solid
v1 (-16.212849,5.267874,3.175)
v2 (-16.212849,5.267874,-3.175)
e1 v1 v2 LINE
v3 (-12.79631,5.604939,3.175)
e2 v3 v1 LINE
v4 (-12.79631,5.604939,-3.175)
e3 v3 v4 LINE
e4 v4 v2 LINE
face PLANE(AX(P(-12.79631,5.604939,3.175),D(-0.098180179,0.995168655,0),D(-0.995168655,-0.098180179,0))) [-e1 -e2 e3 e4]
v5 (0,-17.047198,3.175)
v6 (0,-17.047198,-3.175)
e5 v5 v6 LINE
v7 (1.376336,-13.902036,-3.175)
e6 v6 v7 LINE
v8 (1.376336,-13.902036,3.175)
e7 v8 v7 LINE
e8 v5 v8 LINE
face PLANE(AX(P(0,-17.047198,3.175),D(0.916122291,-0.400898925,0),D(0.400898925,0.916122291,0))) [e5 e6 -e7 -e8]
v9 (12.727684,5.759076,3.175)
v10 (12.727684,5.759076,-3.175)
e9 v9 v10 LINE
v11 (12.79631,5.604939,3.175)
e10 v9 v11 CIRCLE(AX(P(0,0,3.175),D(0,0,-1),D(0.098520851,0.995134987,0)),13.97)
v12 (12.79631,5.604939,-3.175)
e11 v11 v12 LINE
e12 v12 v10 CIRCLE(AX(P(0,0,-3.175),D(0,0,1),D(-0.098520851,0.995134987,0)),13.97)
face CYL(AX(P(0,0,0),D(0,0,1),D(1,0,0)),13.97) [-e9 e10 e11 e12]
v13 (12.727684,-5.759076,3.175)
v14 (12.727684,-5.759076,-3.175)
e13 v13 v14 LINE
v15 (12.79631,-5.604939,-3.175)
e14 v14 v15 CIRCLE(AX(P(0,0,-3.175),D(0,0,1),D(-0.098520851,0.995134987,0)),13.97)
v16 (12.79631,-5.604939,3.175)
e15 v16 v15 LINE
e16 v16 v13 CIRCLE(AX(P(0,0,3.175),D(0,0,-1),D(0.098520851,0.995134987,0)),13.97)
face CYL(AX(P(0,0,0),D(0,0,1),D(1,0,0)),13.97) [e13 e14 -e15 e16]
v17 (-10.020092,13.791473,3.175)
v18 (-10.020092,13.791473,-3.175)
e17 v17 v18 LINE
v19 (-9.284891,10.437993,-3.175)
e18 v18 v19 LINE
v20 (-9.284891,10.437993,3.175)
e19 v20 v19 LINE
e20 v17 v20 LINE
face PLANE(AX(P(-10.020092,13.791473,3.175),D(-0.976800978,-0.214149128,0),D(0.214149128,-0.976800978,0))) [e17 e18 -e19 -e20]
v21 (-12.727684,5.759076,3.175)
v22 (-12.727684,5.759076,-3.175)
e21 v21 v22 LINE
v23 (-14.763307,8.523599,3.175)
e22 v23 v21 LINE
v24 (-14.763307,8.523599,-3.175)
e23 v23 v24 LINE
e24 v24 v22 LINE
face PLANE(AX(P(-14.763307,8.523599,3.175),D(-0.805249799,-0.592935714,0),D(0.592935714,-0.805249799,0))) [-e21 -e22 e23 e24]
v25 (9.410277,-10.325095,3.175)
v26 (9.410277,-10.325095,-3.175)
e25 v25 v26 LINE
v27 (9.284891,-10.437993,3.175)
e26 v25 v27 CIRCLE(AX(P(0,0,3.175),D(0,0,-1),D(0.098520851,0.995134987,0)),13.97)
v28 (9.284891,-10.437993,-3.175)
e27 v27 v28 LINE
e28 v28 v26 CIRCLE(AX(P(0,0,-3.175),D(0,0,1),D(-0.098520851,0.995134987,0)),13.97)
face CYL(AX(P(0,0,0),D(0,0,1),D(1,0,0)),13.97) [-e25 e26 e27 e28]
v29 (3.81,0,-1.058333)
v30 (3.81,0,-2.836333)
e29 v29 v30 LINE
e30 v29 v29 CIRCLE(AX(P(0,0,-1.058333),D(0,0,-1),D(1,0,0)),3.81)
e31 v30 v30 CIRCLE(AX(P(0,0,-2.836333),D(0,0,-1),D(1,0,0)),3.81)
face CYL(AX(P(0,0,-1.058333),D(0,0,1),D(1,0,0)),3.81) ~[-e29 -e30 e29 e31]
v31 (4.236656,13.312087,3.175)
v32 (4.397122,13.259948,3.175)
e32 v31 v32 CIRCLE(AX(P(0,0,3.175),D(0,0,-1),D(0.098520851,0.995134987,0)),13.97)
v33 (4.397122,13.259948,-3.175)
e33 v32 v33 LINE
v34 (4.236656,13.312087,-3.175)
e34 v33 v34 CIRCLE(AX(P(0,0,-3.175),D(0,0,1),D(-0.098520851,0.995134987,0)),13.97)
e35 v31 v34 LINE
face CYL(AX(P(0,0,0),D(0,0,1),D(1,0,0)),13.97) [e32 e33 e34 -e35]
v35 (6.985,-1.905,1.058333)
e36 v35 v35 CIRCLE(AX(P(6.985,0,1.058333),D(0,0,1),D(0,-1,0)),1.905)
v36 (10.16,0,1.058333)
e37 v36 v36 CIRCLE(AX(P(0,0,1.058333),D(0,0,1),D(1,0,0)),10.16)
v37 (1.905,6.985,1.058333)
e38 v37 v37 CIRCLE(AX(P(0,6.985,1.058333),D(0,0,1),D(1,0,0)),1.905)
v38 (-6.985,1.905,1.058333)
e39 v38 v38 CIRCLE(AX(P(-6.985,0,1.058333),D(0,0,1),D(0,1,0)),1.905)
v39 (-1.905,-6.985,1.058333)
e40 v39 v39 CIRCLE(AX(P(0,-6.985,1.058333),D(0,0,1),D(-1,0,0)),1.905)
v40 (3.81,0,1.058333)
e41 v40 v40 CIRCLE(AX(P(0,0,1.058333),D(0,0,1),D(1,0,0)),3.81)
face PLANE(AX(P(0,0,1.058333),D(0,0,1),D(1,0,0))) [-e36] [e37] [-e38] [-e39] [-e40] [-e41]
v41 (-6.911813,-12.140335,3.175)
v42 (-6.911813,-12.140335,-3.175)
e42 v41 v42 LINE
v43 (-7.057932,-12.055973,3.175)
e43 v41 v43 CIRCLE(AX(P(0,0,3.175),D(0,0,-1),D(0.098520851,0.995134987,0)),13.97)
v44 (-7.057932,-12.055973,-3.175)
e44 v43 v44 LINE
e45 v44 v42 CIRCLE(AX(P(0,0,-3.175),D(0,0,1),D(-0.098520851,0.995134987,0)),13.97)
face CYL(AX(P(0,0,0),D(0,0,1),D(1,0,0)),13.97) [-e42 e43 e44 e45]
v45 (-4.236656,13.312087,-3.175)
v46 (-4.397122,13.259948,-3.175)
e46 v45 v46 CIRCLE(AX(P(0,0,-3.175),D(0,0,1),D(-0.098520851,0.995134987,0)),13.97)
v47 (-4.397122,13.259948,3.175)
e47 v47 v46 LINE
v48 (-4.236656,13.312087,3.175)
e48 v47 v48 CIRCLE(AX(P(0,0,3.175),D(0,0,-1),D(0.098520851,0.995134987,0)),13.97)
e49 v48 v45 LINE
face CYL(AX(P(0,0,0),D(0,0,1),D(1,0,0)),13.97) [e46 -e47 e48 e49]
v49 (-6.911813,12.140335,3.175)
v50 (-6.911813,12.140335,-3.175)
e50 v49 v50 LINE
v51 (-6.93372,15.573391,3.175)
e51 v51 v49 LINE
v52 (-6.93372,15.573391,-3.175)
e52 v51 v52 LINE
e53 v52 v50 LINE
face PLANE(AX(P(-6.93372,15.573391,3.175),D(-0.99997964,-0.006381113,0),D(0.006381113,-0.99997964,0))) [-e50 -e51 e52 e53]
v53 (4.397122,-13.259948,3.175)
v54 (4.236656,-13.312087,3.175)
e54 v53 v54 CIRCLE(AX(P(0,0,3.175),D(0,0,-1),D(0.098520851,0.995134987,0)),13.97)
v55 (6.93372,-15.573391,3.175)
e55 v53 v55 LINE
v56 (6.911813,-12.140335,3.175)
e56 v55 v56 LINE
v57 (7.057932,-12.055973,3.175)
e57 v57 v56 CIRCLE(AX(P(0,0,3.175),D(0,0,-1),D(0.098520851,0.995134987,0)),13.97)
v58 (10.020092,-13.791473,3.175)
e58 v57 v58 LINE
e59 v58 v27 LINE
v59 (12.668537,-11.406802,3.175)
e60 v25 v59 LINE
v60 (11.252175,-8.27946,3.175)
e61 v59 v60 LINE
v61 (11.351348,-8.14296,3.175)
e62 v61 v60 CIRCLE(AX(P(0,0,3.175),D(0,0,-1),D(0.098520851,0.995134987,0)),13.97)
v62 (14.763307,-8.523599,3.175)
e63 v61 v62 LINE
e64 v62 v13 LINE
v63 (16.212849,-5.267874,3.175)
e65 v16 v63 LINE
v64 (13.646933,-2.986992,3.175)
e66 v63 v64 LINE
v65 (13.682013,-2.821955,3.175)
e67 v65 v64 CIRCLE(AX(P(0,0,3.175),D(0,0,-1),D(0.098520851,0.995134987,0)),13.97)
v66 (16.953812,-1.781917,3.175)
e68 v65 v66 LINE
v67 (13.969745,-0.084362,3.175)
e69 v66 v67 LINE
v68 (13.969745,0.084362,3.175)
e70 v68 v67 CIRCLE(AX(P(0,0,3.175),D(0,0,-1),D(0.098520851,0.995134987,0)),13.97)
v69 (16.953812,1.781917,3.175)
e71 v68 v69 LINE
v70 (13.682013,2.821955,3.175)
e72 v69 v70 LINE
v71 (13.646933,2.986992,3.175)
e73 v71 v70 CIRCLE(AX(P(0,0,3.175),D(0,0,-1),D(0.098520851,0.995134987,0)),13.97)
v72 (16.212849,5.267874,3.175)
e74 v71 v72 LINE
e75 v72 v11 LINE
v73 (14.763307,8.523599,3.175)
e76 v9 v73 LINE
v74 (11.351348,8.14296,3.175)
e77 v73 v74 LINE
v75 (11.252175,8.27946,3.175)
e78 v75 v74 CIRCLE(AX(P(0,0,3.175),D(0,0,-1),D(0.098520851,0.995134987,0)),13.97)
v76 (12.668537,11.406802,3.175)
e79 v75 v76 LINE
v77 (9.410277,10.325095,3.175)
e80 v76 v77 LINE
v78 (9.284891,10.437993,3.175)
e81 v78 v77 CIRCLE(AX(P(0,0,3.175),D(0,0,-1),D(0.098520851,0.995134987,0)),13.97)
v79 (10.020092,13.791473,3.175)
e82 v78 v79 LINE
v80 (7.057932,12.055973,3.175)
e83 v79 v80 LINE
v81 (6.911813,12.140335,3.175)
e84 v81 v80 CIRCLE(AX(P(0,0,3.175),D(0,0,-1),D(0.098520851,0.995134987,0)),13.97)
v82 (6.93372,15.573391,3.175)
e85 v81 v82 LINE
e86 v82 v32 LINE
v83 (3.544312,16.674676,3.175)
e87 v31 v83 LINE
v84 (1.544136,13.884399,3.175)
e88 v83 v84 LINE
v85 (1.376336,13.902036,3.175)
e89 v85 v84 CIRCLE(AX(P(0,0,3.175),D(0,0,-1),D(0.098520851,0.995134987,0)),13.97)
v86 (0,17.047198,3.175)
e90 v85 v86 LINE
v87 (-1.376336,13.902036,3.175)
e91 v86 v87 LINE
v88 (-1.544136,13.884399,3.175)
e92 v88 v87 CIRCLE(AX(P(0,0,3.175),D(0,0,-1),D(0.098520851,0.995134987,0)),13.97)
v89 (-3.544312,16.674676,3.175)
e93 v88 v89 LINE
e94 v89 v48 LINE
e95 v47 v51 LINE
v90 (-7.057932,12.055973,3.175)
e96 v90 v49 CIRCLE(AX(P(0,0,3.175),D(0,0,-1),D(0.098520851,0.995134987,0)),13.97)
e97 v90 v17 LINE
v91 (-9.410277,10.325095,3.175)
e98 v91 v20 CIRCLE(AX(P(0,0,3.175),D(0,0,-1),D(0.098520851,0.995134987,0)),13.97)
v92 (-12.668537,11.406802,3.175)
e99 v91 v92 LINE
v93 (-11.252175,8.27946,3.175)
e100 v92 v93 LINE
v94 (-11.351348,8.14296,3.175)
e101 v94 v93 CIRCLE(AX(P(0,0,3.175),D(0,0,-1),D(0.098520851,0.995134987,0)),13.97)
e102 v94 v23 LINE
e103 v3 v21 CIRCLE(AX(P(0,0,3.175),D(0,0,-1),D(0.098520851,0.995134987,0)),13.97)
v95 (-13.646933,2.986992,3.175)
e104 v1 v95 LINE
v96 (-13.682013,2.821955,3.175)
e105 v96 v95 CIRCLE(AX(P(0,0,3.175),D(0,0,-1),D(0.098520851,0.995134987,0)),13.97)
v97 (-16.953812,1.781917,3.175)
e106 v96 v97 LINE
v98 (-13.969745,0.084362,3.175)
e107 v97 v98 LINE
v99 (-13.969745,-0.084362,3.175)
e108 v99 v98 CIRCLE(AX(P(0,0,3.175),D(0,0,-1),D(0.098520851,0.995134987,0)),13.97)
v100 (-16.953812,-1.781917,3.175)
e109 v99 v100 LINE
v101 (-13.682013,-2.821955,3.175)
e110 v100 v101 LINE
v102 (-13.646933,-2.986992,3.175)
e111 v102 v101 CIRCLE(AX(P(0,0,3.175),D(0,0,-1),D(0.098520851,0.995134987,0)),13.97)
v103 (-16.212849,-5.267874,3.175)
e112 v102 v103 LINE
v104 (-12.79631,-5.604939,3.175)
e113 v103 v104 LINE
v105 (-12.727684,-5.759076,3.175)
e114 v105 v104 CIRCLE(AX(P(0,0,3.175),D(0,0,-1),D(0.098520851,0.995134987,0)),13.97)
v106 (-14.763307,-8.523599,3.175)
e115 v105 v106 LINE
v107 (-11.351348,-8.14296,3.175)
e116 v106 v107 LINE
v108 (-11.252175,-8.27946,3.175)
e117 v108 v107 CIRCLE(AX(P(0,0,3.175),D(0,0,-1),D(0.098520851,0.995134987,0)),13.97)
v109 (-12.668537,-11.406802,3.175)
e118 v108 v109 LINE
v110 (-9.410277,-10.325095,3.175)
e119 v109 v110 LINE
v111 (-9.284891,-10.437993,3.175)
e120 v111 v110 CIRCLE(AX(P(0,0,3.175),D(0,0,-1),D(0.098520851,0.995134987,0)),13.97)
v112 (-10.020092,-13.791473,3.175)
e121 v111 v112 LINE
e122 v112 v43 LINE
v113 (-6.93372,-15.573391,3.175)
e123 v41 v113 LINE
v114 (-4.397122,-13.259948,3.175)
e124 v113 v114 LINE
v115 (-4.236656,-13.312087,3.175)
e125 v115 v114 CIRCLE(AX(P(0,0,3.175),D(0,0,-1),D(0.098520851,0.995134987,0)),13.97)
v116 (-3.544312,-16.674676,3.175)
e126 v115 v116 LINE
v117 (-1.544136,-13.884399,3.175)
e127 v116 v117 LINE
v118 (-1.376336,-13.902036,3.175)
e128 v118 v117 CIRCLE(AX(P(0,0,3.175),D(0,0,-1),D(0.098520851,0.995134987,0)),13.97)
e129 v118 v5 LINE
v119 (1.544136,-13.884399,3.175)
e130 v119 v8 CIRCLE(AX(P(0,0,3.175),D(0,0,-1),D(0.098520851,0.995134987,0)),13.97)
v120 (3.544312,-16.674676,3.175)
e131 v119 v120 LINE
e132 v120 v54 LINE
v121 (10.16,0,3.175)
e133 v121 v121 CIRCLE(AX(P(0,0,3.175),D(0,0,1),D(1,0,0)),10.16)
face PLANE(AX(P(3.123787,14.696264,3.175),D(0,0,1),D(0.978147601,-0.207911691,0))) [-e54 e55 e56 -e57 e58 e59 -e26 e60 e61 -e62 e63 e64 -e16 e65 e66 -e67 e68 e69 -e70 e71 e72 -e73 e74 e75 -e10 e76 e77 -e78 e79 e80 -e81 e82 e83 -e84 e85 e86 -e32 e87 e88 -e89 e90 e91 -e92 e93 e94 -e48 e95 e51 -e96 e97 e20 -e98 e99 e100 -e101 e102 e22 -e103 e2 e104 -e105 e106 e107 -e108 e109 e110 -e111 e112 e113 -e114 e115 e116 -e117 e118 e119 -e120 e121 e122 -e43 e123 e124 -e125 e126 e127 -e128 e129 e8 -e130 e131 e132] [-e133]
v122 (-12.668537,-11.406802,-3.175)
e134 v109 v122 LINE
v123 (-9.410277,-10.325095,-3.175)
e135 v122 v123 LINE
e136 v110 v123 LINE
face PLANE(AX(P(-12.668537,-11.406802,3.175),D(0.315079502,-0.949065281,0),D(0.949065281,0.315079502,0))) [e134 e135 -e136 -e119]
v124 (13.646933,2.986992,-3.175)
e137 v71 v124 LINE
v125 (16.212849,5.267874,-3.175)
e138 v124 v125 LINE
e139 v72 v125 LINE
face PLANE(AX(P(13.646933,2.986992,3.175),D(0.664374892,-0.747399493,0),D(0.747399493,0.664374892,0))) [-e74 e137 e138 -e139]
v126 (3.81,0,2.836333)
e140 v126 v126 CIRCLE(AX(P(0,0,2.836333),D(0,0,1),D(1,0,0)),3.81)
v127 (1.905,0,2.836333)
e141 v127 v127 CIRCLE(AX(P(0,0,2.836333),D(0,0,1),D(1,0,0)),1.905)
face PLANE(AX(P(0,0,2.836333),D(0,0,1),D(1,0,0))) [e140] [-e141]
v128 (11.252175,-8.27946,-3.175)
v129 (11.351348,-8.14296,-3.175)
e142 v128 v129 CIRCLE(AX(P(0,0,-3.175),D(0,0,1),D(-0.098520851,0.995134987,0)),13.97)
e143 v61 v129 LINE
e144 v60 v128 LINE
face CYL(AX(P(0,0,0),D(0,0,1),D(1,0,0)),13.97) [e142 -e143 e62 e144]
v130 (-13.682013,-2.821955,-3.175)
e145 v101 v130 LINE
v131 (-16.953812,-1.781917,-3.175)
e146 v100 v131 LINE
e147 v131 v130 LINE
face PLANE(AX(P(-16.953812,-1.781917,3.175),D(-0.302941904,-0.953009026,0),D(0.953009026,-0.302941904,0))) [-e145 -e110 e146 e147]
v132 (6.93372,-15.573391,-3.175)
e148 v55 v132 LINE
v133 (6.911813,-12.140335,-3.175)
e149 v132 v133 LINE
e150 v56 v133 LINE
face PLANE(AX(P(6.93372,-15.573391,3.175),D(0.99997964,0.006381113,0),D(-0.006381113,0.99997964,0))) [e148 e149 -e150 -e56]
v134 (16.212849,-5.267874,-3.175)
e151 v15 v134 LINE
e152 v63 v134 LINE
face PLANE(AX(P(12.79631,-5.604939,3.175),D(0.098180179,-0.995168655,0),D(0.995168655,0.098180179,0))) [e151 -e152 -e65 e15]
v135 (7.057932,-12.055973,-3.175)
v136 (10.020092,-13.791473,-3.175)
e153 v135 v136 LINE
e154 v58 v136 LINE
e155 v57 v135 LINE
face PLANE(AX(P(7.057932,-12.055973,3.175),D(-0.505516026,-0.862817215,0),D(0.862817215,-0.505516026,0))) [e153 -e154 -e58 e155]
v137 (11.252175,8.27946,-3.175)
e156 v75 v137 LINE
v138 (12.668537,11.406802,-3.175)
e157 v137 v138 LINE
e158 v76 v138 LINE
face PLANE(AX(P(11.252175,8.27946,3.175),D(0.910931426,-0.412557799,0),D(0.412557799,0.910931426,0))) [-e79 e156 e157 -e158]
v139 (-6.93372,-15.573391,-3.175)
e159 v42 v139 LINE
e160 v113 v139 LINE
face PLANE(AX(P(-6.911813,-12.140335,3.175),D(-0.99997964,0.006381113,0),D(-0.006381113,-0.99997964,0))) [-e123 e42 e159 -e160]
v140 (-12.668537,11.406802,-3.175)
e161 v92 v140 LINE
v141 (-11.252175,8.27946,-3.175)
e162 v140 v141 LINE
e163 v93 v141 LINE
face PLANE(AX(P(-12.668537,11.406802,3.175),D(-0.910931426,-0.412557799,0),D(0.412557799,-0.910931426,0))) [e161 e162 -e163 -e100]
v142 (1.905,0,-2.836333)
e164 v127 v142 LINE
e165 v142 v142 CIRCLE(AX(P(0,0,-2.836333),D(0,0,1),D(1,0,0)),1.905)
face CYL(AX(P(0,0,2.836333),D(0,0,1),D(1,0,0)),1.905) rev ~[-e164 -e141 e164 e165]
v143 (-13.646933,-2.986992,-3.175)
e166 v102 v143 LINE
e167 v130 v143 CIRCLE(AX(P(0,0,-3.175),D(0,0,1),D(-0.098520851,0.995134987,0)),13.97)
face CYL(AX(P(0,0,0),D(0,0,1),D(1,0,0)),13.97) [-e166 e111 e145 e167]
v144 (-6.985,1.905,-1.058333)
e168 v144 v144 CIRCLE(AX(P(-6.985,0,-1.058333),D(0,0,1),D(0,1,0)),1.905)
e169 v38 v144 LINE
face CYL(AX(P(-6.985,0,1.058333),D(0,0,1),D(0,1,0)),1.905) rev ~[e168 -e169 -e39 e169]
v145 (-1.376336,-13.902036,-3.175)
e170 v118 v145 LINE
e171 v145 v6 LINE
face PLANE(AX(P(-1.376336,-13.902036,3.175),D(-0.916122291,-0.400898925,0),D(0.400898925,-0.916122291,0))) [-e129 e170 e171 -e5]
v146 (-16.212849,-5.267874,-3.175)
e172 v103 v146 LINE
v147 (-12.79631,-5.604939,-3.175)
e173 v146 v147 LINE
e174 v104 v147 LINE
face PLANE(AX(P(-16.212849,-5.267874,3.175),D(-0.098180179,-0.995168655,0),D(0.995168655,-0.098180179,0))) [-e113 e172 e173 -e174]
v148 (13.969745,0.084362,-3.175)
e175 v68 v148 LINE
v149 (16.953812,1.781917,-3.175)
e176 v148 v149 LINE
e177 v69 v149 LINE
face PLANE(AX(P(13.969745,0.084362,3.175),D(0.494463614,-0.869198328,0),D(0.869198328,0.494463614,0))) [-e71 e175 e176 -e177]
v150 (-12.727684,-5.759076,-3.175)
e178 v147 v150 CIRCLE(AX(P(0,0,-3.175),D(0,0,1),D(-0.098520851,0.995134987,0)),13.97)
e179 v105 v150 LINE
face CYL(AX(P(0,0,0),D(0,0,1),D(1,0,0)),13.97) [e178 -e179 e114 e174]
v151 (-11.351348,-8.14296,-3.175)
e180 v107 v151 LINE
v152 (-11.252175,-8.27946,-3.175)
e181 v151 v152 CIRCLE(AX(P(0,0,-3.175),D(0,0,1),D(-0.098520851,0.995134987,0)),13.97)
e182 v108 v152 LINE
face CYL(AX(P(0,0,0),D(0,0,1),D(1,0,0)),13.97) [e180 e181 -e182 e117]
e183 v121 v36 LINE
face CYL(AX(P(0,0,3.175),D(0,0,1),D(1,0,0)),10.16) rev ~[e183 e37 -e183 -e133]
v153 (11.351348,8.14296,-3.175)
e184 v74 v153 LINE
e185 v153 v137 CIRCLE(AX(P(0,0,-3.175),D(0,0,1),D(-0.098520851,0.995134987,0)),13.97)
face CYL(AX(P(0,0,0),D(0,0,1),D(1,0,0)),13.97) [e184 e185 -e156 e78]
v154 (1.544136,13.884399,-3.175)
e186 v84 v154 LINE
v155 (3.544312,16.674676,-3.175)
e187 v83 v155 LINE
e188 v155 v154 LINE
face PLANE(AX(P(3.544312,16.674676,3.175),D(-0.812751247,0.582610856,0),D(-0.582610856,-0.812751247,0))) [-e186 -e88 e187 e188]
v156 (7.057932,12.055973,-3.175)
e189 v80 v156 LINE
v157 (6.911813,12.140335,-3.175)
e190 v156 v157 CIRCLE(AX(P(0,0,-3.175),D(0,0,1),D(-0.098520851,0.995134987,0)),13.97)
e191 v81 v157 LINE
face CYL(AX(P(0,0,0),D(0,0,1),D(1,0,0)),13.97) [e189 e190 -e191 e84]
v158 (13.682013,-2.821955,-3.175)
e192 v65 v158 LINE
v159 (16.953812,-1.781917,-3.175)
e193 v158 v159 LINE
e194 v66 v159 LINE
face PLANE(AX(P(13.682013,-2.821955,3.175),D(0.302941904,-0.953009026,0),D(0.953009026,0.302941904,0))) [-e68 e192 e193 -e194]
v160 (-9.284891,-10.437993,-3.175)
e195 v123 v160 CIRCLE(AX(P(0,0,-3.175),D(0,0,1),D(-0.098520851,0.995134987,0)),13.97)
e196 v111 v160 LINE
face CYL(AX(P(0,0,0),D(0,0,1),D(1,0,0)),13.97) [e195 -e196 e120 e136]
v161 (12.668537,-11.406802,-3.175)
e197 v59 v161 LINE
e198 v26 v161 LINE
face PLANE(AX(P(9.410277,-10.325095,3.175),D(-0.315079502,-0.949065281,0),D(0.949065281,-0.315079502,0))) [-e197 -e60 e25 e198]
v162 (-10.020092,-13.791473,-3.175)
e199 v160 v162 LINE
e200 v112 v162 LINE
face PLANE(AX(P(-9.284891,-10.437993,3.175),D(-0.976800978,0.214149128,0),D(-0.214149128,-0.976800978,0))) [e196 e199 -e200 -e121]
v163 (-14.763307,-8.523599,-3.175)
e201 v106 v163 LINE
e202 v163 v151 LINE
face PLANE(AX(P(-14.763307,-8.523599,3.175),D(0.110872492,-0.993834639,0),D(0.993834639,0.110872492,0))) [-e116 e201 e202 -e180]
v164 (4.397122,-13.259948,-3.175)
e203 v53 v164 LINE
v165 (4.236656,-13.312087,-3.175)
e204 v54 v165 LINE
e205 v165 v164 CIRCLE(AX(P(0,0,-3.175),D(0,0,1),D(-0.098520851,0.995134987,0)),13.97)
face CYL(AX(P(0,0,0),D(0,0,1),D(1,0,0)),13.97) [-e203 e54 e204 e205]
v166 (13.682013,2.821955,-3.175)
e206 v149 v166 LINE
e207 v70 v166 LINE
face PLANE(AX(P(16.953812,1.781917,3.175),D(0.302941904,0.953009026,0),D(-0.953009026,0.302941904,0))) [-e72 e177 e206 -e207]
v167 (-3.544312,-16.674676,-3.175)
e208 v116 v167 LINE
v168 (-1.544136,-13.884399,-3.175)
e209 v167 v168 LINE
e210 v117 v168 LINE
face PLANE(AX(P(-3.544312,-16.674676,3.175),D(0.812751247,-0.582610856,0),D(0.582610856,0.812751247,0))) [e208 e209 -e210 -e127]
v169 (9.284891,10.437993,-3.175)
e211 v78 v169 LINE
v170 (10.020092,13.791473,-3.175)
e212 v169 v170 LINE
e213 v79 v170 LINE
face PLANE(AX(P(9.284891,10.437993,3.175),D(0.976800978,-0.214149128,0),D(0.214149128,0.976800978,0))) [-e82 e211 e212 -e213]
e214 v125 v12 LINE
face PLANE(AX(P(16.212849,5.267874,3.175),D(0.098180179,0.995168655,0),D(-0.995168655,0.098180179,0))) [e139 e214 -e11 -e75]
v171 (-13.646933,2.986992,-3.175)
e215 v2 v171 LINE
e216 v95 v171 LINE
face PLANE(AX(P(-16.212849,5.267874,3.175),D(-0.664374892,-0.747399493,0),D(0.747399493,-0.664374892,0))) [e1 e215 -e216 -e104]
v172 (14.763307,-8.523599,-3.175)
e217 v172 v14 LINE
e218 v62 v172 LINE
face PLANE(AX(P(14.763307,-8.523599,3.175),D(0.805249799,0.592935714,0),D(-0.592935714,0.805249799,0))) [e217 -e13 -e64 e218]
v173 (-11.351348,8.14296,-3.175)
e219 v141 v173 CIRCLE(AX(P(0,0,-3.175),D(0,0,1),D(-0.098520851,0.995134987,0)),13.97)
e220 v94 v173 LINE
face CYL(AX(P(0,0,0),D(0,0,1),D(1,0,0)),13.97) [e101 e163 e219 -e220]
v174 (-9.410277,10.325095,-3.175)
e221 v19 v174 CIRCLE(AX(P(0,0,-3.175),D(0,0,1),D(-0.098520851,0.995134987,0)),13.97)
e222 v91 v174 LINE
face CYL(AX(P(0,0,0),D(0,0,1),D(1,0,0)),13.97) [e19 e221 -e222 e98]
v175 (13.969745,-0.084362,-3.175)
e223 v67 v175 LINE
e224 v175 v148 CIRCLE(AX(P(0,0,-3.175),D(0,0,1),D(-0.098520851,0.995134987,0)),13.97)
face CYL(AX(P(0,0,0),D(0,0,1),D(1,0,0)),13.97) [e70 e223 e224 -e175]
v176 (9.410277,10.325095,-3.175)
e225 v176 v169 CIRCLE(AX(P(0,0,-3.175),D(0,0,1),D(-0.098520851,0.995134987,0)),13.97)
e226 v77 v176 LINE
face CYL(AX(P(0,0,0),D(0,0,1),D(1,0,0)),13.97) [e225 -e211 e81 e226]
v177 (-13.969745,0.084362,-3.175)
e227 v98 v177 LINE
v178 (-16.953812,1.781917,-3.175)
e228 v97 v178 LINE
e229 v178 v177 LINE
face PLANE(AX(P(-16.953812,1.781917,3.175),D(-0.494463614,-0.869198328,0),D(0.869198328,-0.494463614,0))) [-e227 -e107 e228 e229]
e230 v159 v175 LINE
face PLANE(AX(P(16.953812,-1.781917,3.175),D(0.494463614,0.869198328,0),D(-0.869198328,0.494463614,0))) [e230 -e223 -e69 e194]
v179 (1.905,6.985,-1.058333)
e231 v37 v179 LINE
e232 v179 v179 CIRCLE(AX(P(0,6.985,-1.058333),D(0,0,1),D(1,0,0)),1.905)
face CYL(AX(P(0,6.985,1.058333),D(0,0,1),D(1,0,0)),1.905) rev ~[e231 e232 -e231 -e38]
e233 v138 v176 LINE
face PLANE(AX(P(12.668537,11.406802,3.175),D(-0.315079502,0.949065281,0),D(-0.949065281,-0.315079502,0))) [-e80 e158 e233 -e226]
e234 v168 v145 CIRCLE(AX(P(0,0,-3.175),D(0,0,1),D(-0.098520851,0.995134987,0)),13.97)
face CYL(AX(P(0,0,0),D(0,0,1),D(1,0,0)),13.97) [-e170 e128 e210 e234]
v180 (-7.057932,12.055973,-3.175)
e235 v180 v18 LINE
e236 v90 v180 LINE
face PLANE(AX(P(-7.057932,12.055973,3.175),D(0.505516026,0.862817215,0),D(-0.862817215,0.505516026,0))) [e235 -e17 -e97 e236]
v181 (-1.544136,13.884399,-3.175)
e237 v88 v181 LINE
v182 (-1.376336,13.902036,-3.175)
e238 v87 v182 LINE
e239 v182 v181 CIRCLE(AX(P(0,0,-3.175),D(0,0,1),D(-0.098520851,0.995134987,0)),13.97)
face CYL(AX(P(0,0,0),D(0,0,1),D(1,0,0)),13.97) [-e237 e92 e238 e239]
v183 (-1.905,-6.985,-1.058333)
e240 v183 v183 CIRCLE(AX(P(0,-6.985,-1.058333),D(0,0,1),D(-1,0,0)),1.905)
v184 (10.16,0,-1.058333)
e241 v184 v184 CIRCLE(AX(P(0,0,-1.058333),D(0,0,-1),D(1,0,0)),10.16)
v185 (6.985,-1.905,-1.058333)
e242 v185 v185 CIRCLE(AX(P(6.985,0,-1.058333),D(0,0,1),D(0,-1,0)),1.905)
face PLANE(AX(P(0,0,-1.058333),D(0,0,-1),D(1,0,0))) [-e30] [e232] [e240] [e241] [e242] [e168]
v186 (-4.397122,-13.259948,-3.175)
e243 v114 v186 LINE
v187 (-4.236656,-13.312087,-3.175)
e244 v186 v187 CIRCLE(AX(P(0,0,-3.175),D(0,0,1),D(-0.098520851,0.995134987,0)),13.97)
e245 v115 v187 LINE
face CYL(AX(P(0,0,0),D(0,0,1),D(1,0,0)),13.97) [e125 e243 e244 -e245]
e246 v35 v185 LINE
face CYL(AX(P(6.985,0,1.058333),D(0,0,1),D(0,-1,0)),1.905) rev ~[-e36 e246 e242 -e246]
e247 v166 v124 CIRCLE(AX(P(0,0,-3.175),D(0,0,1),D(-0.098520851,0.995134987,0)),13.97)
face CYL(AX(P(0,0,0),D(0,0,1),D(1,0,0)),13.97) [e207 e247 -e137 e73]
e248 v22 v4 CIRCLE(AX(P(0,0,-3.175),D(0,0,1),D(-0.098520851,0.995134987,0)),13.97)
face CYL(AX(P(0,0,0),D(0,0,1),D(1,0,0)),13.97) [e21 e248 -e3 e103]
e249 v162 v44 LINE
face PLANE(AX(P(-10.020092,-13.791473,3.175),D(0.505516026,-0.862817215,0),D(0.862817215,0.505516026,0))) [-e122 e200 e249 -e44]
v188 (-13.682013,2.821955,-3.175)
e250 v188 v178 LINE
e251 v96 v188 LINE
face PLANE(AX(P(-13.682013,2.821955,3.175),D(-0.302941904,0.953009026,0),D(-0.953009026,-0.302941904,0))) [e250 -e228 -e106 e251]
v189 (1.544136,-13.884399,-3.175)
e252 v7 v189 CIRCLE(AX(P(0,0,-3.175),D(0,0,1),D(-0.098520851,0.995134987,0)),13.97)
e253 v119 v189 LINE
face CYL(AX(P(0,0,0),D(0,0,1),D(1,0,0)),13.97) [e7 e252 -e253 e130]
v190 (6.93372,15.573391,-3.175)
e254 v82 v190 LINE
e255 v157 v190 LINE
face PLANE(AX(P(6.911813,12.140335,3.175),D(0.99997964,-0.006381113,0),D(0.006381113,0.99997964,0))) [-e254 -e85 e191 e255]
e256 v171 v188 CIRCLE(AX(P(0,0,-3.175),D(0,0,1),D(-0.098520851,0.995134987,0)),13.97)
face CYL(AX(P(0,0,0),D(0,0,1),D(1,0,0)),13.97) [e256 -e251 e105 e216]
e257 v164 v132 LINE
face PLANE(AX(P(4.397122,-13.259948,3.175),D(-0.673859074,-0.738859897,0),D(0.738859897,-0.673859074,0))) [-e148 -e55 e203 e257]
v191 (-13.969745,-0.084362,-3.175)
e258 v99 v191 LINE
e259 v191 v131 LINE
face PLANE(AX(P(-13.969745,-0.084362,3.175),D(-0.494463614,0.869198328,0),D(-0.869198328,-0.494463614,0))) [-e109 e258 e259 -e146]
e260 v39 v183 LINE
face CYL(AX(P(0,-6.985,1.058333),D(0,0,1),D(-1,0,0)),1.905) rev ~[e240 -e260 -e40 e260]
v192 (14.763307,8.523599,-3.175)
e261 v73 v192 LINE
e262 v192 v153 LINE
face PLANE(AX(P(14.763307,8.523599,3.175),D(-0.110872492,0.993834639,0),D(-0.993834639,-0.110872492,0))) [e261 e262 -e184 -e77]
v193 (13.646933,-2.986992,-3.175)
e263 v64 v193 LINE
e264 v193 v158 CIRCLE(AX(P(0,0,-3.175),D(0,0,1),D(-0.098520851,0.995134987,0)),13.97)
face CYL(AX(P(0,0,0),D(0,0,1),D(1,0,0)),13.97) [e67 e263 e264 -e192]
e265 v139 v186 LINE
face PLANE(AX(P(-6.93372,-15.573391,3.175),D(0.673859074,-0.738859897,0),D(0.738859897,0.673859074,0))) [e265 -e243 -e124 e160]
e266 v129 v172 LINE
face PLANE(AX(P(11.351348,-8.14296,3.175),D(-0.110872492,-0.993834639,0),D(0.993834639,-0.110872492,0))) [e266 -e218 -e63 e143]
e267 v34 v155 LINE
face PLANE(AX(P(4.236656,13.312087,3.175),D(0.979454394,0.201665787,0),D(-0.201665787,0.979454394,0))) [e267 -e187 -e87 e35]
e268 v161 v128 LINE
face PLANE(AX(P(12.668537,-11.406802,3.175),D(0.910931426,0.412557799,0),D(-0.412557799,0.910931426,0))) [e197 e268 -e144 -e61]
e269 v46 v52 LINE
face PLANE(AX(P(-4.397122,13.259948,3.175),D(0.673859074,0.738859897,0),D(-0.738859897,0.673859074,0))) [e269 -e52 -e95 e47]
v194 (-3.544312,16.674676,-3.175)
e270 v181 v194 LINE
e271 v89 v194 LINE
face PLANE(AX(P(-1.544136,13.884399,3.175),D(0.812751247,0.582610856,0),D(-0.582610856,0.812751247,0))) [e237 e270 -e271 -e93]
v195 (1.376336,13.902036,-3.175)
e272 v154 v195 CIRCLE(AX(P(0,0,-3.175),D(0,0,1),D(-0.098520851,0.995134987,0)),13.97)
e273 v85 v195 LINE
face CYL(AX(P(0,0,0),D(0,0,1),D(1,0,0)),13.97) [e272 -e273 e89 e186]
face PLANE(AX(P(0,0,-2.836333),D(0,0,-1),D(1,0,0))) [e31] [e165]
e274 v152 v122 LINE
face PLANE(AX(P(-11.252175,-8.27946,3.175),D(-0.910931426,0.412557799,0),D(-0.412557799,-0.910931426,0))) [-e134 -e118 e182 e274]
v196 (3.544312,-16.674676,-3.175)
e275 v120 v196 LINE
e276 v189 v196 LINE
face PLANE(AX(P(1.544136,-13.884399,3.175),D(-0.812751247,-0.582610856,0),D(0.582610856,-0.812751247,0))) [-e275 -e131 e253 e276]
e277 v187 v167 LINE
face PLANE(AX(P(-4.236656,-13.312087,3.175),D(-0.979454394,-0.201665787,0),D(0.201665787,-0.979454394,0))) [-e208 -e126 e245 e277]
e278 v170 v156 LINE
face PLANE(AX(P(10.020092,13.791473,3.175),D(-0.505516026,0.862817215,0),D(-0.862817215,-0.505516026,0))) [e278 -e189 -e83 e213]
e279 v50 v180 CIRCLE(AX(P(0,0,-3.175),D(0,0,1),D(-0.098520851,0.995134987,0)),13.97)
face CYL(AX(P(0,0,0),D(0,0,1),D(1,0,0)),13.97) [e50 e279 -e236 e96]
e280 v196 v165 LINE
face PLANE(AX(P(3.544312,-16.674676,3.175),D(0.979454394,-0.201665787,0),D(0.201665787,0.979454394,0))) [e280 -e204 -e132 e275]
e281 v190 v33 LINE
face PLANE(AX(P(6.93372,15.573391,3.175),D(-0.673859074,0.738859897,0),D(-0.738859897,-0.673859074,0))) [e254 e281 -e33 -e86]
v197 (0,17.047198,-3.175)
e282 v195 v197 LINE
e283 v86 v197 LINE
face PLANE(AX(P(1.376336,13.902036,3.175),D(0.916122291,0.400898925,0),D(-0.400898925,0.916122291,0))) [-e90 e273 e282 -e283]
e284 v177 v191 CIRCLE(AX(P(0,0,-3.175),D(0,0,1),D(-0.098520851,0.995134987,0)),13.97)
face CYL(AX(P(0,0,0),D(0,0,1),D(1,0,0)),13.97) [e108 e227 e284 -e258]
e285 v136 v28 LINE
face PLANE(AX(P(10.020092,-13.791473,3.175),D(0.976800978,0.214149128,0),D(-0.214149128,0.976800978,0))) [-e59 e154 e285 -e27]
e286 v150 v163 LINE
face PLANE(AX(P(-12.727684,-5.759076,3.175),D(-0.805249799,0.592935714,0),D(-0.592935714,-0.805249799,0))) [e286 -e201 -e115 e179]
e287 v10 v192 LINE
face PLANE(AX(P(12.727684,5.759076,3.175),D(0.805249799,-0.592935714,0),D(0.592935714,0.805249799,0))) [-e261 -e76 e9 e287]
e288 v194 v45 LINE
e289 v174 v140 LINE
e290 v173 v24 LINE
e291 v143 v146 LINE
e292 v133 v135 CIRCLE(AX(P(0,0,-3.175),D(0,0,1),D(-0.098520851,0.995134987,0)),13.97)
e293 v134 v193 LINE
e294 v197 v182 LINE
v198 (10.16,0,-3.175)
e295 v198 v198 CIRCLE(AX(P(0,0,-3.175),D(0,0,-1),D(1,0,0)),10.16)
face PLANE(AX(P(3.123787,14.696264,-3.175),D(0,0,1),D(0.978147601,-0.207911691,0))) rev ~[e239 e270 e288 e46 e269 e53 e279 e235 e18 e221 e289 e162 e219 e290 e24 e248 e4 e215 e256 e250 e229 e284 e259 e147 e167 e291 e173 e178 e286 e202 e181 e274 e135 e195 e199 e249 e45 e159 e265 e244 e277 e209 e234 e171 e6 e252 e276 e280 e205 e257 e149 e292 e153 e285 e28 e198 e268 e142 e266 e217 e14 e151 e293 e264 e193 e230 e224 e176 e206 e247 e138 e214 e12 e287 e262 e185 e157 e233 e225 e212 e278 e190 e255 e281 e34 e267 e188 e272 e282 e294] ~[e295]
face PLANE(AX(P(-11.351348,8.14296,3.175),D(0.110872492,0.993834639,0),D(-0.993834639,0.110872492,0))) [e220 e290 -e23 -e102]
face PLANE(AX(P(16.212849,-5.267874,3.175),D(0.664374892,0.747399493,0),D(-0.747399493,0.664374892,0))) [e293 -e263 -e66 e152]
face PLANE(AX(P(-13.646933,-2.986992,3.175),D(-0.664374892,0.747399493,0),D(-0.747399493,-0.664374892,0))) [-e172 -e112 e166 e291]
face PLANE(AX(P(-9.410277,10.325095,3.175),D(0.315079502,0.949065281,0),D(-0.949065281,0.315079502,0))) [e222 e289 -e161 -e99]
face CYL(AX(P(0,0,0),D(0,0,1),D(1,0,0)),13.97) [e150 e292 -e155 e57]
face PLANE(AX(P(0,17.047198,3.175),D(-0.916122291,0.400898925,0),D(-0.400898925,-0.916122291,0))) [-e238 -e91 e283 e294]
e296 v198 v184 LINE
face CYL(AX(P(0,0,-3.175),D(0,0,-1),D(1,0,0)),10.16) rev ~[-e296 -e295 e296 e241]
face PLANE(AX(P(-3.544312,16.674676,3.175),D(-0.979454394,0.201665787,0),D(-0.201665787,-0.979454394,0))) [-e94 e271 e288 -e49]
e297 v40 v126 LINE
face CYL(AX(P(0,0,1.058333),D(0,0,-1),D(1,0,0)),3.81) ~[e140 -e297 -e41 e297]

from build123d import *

# Parameters (mm, degrees)
F0_R             = 13.97
F1_DEPTH         = 3.175
F2_R             = 10.16
F3_DEPTH         = 2.1166666667
F4_R             = 10.16
F5_DEPTH         = 2.1166666667
F6_R             = 1.905
F7_DEPTH         = 2.54
F7_COPIES_COUNT  = 4
F8_R             = 3.81
F9_DEPTH         = 1.778
F10_R            = 3.81
F11_DEPTH        = 1.778
F13_DEPTH        = 6.35
F13_COPIES_COUNT = 30
F14_R            = 1.905
F15_DEPTH        = 5.6726666667


# Not quite as in the source:
# - a pattern or mirror of a feature is missing from the dataset's text; its kind, count and spacing are read off the source's solid


with BuildPart() as f1:
    # F0 (on Top) → F1 (new body, symmetric)
    with BuildSketch(Plane.XY):
        Circle(F0_R)
    extrude(amount=F1_DEPTH, both=True)

    # F2 (on face) → F3 (cut)
    with BuildSketch(Plane.XY.offset(3.175)):
        Circle(F2_R)
    extrude(amount=-F3_DEPTH, mode=Mode.SUBTRACT)

    # F4 (on face) → F5 (cut)
    with BuildSketch(Plane(origin=(0, 0, -3.175), x_dir=(1, 0, 0), z_dir=(0, 0, -1))):
        Circle(F4_R)
    extrude(amount=-F5_DEPTH, mode=Mode.SUBTRACT)

    # F6 (on face) → F7 (cut)
    with BuildSketch(Plane.XY.offset(1.0583333333)):
        with Locations((0, 6.985)):
            Circle(F6_R)
    f7 = extrude(amount=-F7_DEPTH, mode=Mode.SUBTRACT)

    # F7_copies: F7 ×4 about axis
    f7_copies_axis = Axis((0, 0, 0), (0, 0, 1))
    for i in range(1, F7_COPIES_COUNT):
        add(f7.rotate(f7_copies_axis, i * 360 / F7_COPIES_COUNT), mode=Mode.SUBTRACT)

    # F8 (on face) → F9 (join)
    with BuildSketch(Plane.XY.offset(1.0583333333)):
        Circle(F8_R)
    extrude(amount=F9_DEPTH)

    # F10 (on face) → F11 (join)
    with BuildSketch(Plane(origin=(0, 0, -1.0583333333), x_dir=(1, 0, 0), z_dir=(0, 0, -1))):
        Circle(F10_R)
    extrude(amount=F11_DEPTH)

    # F12 (on face) → F13 (join, through all)
    with BuildSketch(Plane.XY.offset(3.175)):
        Polygon((0, 17.0471984893), (-1.3763362913, 13.9020357651), (1.3763362913, 13.9020357651), align=None)
    f13 = extrude(amount=-F13_DEPTH)

    # F13_copies: F13 ×30 about axis
    f13_copies_axis = Axis((0, 0, 0), (0, 0, 1))
    for i in range(1, F13_COPIES_COUNT):
        add(f13.rotate(f13_copies_axis, i * 360 / F13_COPIES_COUNT))

    # F14 (on face) → F15 (cut, through all)
    with BuildSketch(Plane.XY.offset(2.8363333333)):
        Circle(F14_R)
    extrude(amount=-F15_DEPTH, mode=Mode.SUBTRACT)


solid = f1.part
